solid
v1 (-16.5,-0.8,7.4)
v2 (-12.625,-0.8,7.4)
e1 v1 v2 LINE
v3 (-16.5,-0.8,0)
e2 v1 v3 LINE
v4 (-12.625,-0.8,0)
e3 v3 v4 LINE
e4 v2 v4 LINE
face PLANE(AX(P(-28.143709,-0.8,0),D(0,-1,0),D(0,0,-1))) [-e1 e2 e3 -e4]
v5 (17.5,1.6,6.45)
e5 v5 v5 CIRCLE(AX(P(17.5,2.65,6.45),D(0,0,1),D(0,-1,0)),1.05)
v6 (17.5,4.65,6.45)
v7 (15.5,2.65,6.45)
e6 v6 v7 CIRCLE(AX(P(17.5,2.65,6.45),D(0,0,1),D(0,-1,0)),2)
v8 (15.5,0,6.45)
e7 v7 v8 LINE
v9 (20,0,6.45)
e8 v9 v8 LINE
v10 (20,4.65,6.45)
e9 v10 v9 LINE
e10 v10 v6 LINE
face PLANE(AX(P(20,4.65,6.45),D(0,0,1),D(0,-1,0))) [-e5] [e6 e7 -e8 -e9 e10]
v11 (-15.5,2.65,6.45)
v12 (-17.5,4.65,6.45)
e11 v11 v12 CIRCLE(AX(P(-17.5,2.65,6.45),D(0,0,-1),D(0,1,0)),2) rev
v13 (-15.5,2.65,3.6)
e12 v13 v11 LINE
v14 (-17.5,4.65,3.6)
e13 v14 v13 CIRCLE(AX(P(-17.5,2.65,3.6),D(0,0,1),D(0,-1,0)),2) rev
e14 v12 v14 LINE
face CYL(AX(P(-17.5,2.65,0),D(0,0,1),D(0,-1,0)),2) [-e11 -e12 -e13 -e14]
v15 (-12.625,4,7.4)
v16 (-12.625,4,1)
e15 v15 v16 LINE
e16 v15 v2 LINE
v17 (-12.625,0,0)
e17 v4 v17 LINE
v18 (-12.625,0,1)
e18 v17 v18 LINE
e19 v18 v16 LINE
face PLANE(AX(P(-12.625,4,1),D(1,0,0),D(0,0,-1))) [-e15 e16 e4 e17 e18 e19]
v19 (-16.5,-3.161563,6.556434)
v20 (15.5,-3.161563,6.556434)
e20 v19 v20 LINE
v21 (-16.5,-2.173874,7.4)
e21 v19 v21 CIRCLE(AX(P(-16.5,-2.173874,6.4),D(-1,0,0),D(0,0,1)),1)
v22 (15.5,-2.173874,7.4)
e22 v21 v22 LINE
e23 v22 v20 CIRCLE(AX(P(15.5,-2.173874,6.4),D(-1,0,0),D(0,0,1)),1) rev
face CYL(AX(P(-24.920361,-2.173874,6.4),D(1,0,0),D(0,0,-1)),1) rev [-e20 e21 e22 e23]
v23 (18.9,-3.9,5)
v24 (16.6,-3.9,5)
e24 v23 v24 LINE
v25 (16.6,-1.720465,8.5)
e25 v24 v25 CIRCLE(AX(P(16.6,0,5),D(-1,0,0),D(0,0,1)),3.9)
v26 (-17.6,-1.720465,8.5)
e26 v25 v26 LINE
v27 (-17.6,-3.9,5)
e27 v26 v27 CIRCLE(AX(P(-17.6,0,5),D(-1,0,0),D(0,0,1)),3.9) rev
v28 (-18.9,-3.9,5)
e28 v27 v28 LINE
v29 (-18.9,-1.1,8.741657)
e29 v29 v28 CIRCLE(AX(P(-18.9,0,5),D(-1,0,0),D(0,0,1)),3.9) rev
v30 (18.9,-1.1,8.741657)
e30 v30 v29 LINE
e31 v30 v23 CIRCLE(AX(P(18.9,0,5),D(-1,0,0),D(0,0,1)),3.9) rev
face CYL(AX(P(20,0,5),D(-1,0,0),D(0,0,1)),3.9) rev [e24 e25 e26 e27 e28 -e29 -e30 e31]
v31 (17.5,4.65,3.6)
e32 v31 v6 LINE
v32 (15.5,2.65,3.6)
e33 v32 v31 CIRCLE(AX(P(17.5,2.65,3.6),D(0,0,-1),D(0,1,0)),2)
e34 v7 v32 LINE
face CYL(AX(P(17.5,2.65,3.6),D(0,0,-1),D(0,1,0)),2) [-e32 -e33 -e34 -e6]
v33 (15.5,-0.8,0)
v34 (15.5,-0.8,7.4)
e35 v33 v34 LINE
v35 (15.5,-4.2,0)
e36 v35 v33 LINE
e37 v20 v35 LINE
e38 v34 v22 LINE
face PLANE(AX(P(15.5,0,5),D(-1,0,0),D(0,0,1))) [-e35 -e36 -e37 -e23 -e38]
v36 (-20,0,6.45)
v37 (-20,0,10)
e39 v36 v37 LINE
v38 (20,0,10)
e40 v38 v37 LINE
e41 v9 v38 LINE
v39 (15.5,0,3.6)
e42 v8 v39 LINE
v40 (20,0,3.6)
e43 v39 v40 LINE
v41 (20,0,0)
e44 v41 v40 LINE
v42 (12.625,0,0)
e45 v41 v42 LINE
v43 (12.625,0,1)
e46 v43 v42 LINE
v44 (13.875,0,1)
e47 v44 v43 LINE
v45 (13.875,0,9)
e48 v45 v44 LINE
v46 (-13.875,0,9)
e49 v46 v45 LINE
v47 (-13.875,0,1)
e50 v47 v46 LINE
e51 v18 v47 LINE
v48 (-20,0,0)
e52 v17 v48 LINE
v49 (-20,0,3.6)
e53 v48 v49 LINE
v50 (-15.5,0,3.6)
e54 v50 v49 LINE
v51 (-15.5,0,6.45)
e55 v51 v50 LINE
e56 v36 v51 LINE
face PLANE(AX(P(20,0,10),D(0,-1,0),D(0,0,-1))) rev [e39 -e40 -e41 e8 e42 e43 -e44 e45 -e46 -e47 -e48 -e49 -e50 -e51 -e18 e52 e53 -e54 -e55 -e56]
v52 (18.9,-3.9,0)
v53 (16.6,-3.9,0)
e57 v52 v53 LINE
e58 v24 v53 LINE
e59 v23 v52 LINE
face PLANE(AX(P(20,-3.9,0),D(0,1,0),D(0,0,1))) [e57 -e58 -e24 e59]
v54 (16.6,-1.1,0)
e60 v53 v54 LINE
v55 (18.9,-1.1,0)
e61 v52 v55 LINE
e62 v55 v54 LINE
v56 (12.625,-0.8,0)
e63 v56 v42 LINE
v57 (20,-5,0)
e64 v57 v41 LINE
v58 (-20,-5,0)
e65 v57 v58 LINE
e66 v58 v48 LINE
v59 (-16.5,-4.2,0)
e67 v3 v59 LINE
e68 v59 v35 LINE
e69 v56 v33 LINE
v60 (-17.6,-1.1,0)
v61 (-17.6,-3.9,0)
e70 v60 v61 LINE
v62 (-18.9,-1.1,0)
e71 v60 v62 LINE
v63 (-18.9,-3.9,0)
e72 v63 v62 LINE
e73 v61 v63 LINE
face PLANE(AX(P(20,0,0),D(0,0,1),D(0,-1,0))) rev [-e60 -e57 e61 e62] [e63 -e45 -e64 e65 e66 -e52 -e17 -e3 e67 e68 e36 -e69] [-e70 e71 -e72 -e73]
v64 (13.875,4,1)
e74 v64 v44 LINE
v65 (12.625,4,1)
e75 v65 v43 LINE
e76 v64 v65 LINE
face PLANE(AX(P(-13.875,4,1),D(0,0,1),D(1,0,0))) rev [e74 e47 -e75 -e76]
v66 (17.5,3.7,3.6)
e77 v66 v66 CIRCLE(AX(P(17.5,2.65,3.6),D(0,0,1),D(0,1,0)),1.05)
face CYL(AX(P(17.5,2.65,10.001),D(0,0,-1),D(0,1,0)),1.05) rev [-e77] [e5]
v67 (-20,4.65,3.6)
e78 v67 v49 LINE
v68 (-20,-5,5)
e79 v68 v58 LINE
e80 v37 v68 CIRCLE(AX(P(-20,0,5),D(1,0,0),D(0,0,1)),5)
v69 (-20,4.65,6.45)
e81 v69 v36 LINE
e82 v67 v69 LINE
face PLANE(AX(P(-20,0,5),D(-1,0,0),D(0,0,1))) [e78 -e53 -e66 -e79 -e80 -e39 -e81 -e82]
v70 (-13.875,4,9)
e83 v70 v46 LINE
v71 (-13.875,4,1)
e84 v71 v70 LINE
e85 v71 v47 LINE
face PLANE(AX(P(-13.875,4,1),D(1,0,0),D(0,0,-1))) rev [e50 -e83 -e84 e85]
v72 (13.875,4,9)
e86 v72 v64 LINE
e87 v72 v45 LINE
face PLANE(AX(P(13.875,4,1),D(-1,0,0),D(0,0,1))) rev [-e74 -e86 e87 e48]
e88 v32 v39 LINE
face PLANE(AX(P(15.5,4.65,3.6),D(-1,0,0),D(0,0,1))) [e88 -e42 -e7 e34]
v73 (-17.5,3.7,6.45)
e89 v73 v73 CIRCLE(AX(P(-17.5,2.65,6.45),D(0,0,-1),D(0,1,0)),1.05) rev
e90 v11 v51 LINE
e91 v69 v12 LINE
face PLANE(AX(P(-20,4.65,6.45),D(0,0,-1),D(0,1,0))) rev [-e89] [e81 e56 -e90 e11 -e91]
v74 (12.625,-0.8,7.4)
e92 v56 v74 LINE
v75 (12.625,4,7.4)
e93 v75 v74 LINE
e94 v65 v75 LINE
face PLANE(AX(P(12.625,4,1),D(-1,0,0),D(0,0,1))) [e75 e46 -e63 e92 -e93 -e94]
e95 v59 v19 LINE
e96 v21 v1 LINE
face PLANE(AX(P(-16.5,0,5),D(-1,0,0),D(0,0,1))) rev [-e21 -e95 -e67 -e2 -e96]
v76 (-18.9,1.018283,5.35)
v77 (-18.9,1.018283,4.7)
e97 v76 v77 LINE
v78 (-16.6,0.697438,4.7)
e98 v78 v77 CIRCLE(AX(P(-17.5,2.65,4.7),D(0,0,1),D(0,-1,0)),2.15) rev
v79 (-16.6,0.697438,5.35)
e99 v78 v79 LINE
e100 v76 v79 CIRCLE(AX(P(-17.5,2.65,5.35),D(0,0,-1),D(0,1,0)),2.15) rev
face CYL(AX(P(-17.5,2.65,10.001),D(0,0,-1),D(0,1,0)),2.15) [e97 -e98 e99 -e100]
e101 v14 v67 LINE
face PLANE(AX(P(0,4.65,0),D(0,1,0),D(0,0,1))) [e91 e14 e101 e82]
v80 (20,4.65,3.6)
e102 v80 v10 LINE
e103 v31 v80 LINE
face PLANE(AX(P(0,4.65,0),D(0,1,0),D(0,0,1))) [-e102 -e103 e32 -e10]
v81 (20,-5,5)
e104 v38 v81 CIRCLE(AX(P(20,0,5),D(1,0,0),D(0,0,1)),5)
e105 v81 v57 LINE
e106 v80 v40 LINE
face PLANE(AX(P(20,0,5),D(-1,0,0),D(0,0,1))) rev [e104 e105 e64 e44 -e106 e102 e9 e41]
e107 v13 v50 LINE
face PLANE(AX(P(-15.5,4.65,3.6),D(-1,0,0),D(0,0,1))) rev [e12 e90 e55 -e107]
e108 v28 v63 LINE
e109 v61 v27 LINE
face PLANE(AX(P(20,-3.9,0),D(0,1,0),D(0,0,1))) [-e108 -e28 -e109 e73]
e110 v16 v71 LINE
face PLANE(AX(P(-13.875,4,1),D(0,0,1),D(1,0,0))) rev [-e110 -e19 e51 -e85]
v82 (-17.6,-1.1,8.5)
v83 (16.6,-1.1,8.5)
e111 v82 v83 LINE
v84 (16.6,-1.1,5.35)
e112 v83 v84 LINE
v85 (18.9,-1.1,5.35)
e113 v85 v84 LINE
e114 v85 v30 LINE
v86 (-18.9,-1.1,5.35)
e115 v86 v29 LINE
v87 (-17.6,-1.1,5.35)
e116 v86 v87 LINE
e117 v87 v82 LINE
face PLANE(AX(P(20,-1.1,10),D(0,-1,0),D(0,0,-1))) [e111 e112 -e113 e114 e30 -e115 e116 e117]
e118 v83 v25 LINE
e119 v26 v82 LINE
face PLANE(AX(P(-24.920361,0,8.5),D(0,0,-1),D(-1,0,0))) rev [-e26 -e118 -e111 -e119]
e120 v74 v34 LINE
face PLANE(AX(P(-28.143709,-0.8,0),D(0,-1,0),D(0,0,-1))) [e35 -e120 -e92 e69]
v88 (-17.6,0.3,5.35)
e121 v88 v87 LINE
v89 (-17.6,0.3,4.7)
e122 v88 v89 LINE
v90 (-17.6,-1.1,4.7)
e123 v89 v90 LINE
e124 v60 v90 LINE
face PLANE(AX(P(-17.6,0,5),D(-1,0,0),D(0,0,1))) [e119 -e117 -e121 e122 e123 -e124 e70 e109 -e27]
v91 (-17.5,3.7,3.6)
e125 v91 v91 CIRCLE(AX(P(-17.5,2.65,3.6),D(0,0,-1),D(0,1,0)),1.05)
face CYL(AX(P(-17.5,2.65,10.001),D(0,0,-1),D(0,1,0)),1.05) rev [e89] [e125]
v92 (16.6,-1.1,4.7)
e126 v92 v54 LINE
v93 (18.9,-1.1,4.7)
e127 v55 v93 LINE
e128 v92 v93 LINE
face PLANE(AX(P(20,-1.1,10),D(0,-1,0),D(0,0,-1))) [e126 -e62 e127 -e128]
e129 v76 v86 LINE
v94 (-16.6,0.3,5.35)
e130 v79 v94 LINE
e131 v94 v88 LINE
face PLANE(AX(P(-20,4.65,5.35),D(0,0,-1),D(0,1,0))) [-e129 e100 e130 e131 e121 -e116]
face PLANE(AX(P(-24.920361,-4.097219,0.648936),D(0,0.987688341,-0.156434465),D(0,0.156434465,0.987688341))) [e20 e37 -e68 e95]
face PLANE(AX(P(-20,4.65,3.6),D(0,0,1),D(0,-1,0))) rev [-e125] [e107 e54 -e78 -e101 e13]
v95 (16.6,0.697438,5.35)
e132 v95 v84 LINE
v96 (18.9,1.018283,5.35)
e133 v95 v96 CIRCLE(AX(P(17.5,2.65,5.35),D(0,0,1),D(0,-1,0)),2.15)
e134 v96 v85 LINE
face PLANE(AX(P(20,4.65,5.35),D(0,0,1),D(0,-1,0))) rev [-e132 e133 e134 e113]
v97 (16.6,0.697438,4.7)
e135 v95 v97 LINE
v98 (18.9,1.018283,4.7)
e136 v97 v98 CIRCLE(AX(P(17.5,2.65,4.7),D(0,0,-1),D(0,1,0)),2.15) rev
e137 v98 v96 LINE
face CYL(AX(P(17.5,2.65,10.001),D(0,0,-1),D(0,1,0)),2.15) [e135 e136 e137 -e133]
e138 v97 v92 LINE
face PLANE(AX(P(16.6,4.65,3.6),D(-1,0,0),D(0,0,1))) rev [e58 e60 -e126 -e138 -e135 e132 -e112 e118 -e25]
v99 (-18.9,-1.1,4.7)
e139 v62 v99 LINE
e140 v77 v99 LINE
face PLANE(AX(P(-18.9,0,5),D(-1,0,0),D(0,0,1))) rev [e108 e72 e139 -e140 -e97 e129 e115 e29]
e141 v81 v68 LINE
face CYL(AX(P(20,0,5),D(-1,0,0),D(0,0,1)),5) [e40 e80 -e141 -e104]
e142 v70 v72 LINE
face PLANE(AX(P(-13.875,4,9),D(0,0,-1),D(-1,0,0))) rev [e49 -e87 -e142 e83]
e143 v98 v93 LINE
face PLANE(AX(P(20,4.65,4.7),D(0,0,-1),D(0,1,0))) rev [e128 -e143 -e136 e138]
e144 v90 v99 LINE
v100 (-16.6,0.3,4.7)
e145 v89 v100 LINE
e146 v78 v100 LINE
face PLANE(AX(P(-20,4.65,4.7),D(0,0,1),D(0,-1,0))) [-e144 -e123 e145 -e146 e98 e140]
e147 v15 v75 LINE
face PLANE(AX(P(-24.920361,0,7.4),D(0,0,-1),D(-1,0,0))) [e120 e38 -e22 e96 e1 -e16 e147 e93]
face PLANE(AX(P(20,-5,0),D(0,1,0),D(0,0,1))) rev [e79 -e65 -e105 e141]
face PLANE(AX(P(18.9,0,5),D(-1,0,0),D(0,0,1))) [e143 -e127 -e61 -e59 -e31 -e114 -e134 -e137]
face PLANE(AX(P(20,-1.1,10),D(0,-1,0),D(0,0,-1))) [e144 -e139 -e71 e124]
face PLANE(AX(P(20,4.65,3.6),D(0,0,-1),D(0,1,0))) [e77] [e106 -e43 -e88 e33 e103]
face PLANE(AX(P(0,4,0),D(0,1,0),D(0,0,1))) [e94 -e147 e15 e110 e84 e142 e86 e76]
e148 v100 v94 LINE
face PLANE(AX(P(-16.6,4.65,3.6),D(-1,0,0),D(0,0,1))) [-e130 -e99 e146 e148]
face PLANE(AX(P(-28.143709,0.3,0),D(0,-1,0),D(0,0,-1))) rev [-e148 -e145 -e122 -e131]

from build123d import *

# Parameters (mm, degrees)
BOSS_EXTRUDE1_DEPTH     = 20
SKETCH2_W               = 27.75
SKETCH2_H               = 8
BOSS_EXTRUDE2_DEPTH     = 4
CUT_EXTRUDE1_DEPTH      = 12.625
CUT_EXTRUDE1_DEPTH_BACK = 12.625
SKETCH6_W               = 4.5
SKETCH6_H               = 2.85
BOSS_EXTRUDE3_DEPTH     = 4.65
FILLET1_R               = 2
CUT_EXTRUDE2_REACH      = 23.586
SKETCH7_R               = 1.05
FILLET1_OF_MIRROR1_R    = 2
CUT_EXTRUDE3_START      = -16.5
CUT_EXTRUDE3_DEPTH      = 32
SHELL1_OUTLINE_W        = 2.3
SHELL1_OUTLINE_H        = 2.8
SHELL1_OUTLINE_W_2      = 1.3
SHELL1_DEPTH            = 5
SHELL1_START            = 4.7
SHELL1_2_DEPTH          = 0.65
SHELL1_START_2          = 16.6
SHELL1_3_DEPTH          = 2.3
SHELL1_START_3          = -18.9
SHELL1_4_DEPTH          = 1.3
SHELL1_START_4          = -17.6
SHELL1_5_DEPTH          = 34.2


with BuildPart() as part:
    # Sketch1 → Boss-Extrude1 (new, symmetric)
    with BuildSketch(Plane(origin=(0, 0, 0), x_dir=(0, 0, -1), z_dir=(1, 0, 0))):
        with BuildLine():
            Line((-10, 0), (0, 0))
            Line((0, 0), (0, -5))
            Line((0, -5), (-5, -5))
            ThreePointArc((-5, -5), (-8.535533906, -3.535533906), (-10, 0))
        make_face()
    extrude(amount=BOSS_EXTRUDE1_DEPTH, both=True)

    # Sketch2 → Boss-Extrude2 (add)
    with BuildSketch(Plane(origin=(0, 0, 0), x_dir=(1, 0, 0), z_dir=(0, 1, 0))):
        with Locations((0, -5)):
            Rectangle(SKETCH2_W, SKETCH2_H)
    extrude(amount=BOSS_EXTRUDE2_DEPTH)

    # Sketch4 → Cut-Extrude1 (cut, two sides: drawn at the far end of the back side and taken through both)
    with BuildSketch(Plane(origin=(0, 0, 0), x_dir=(0, 0, -1), z_dir=(1, 0, 0)).offset(-CUT_EXTRUDE1_DEPTH_BACK)):
        Polygon((-1, -0.8), (0, -0.8), (0, 4), (-7.4, 4), (-7.4, -0.8), align=None)
        with BuildLine():
            Line((-6.556434465, -3.161562797), (0, -4.2))
            Line((0, -4.2), (0, -0.8))
            Line((0, -0.8), (-1, -0.8))
            Line((-1, -0.8), (-7.4, -0.8))
            Line((-7.4, -0.8), (-7.4, -2.173874456))
            ThreePointArc((-7.4, -2.173874456), (-7.160405966, -2.823322504), (-6.556434465, -3.161562797))
        make_face()
    extrude(amount=CUT_EXTRUDE1_DEPTH + CUT_EXTRUDE1_DEPTH_BACK, mode=Mode.SUBTRACT)

    # Sketch6 → Boss-Extrude3 (add)
    with BuildSketch(Plane(origin=(0, 0, 0), x_dir=(1, 0, 0), z_dir=(0, 1, 0))):
        with Locations((-17.75, -5.025)):
            Rectangle(SKETCH6_W, SKETCH6_H)
    boss_extrude3 = extrude(amount=BOSS_EXTRUDE3_DEPTH)

    # Fillet1
    fillet1_edges = [part.edges().sort_by_distance(p)[0] for p in [
        (-15.5, 4.65, 5.025),
    ]]
    fillet(fillet1_edges, radius=FILLET1_R)

    # Sketch7 → Cut-Extrude2 (cut, up to next)
    with BuildSketch(Plane(origin=(0, 0, 3.6), x_dir=(-1, 0, 0), z_dir=(0, 0, -1)), mode=Mode.PRIVATE) as cut_extrude2_sk1:
        with Locations(Location((17.5, 2.65, 0), (0, 0, 90))):
            Circle(SKETCH7_R)
    cut_extrude2_tool1 = extrude(cut_extrude2_sk1.sketch, amount=-CUT_EXTRUDE2_REACH, mode=Mode.PRIVATE) & part.part
    cut_extrude2 = cut_extrude2_tool1.solids().sort_by_distance((-17.5, 2.65, 3.6))[0]
    add(cut_extrude2, mode=Mode.SUBTRACT)

    # Mirror1: Boss-Extrude3, Cut-Extrude2 across plane
    add(boss_extrude3.mirror(Plane(origin=(0, 0, 0), x_dir=(0, 0, 1), z_dir=(1, 0, 0))))
    add(cut_extrude2.mirror(Plane(origin=(0, 0, 0), x_dir=(0, 0, 1), z_dir=(1, 0, 0))), mode=Mode.SUBTRACT)

    # Fillet1 of Mirror1
    fillet1_of_mirror1_edges = [part.edges().sort_by_distance(p)[0] for p in [
        (15.5, 4.65, 5.025),
    ]]
    fillet(fillet1_of_mirror1_edges, radius=FILLET1_OF_MIRROR1_R)

    # Sketch4<3> → Cut-Extrude3 (cut)
    with BuildSketch(Plane(origin=(0, 0, 0), x_dir=(0, 0, -1), z_dir=(1, 0, 0)).offset(CUT_EXTRUDE3_START)):
        with BuildLine():
            Line((-6.556434465, -3.161562797), (0, -4.2))
            Line((0, -4.2), (0, -0.8))
            Line((0, -0.8), (-1, -0.8))
            Line((-1, -0.8), (-7.4, -0.8))
            Line((-7.4, -0.8), (-7.4, -2.173874456))
            ThreePointArc((-7.4, -2.173874456), (-7.160405966, -2.823322504), (-6.556434465, -3.161562797))
        make_face()
    extrude(amount=CUT_EXTRUDE3_DEPTH, mode=Mode.SUBTRACT)

    # Shell1: read off the stored shape, not the designer's step
    # Shell1 outline → Shell1 (cut)
    with BuildSketch(Plane.XY):
        with Locations((17.75, -2.5)):
            Rectangle(SHELL1_OUTLINE_W, SHELL1_OUTLINE_H)
        with Locations((-18.25, -2.5)):
            Rectangle(SHELL1_OUTLINE_W_2, SHELL1_OUTLINE_H)
    extrude(amount=SHELL1_DEPTH, mode=Mode.SUBTRACT)

    # Shell1 2 outline → Shell1 2 (cut)
    with BuildSketch(Plane.XY.offset(SHELL1_START)):
        with BuildLine():
            Line((16.6, 0.697437581), (16.6, -1.1))
            Line((16.6, -1.1), (18.9, -1.1))
            Line((18.9, -1.1), (18.9, 1.018283113))
            ThreePointArc((18.9, 1.018283113), (17.797044549, 0.520618743), (16.6, 0.697437581))
        make_face()
        with BuildLine():
            Line((-16.6, 0.3), (-16.6, 0.697437581))
            ThreePointArc((-16.6, 0.697437581), (-17.797044549, 0.520618743), (-18.9, 1.018283113))
            Line((-18.9, 1.018283113), (-18.9, -1.1))
            Line((-18.9, -1.1), (-17.6, -1.1))
            Line((-17.6, -1.1), (-17.6, 0.3))
            Line((-17.6, 0.3), (-16.6, 0.3))
        make_face()
    extrude(amount=SHELL1_2_DEPTH, mode=Mode.SUBTRACT)

    # Shell1 3 outline → Shell1 3 (cut)
    with BuildSketch(Plane.YZ.offset(SHELL1_START_2)):
        with BuildLine():
            Line((-3.9, 5), (-1.1, 5))
            Line((-1.1, 5), (-1.1, 8.741657387))
            ThreePointArc((-1.1, 8.741657387), (-3.122498999, 7.336664289), (-3.9, 5))
        make_face()
    extrude(amount=SHELL1_3_DEPTH, mode=Mode.SUBTRACT)

    # Shell1 4 outline → Shell1 4 (cut)
    with BuildSketch(Plane.YZ.offset(SHELL1_START_3)):
        with BuildLine():
            Line((-3.9, 5), (-1.1, 5))
            Line((-1.1, 5), (-1.1, 8.741657387))
            ThreePointArc((-1.1, 8.741657387), (-3.122498999, 7.336664289), (-3.9, 5))
        make_face()
    extrude(amount=SHELL1_4_DEPTH, mode=Mode.SUBTRACT)

    # Shell1 5 outline → Shell1 5 (cut)
    with BuildSketch(Plane.YZ.offset(SHELL1_START_4)):
        with BuildLine():
            ThreePointArc((-1.1, 8.741657387), (-1.415399361, 8.63409475), (-1.720465053, 8.5))
            Line((-1.720465053, 8.5), (-1.1, 8.5))
            Line((-1.1, 8.5), (-1.1, 8.741657387))
        make_face()
    extrude(amount=SHELL1_5_DEPTH, mode=Mode.SUBTRACT)


solid = part.part
